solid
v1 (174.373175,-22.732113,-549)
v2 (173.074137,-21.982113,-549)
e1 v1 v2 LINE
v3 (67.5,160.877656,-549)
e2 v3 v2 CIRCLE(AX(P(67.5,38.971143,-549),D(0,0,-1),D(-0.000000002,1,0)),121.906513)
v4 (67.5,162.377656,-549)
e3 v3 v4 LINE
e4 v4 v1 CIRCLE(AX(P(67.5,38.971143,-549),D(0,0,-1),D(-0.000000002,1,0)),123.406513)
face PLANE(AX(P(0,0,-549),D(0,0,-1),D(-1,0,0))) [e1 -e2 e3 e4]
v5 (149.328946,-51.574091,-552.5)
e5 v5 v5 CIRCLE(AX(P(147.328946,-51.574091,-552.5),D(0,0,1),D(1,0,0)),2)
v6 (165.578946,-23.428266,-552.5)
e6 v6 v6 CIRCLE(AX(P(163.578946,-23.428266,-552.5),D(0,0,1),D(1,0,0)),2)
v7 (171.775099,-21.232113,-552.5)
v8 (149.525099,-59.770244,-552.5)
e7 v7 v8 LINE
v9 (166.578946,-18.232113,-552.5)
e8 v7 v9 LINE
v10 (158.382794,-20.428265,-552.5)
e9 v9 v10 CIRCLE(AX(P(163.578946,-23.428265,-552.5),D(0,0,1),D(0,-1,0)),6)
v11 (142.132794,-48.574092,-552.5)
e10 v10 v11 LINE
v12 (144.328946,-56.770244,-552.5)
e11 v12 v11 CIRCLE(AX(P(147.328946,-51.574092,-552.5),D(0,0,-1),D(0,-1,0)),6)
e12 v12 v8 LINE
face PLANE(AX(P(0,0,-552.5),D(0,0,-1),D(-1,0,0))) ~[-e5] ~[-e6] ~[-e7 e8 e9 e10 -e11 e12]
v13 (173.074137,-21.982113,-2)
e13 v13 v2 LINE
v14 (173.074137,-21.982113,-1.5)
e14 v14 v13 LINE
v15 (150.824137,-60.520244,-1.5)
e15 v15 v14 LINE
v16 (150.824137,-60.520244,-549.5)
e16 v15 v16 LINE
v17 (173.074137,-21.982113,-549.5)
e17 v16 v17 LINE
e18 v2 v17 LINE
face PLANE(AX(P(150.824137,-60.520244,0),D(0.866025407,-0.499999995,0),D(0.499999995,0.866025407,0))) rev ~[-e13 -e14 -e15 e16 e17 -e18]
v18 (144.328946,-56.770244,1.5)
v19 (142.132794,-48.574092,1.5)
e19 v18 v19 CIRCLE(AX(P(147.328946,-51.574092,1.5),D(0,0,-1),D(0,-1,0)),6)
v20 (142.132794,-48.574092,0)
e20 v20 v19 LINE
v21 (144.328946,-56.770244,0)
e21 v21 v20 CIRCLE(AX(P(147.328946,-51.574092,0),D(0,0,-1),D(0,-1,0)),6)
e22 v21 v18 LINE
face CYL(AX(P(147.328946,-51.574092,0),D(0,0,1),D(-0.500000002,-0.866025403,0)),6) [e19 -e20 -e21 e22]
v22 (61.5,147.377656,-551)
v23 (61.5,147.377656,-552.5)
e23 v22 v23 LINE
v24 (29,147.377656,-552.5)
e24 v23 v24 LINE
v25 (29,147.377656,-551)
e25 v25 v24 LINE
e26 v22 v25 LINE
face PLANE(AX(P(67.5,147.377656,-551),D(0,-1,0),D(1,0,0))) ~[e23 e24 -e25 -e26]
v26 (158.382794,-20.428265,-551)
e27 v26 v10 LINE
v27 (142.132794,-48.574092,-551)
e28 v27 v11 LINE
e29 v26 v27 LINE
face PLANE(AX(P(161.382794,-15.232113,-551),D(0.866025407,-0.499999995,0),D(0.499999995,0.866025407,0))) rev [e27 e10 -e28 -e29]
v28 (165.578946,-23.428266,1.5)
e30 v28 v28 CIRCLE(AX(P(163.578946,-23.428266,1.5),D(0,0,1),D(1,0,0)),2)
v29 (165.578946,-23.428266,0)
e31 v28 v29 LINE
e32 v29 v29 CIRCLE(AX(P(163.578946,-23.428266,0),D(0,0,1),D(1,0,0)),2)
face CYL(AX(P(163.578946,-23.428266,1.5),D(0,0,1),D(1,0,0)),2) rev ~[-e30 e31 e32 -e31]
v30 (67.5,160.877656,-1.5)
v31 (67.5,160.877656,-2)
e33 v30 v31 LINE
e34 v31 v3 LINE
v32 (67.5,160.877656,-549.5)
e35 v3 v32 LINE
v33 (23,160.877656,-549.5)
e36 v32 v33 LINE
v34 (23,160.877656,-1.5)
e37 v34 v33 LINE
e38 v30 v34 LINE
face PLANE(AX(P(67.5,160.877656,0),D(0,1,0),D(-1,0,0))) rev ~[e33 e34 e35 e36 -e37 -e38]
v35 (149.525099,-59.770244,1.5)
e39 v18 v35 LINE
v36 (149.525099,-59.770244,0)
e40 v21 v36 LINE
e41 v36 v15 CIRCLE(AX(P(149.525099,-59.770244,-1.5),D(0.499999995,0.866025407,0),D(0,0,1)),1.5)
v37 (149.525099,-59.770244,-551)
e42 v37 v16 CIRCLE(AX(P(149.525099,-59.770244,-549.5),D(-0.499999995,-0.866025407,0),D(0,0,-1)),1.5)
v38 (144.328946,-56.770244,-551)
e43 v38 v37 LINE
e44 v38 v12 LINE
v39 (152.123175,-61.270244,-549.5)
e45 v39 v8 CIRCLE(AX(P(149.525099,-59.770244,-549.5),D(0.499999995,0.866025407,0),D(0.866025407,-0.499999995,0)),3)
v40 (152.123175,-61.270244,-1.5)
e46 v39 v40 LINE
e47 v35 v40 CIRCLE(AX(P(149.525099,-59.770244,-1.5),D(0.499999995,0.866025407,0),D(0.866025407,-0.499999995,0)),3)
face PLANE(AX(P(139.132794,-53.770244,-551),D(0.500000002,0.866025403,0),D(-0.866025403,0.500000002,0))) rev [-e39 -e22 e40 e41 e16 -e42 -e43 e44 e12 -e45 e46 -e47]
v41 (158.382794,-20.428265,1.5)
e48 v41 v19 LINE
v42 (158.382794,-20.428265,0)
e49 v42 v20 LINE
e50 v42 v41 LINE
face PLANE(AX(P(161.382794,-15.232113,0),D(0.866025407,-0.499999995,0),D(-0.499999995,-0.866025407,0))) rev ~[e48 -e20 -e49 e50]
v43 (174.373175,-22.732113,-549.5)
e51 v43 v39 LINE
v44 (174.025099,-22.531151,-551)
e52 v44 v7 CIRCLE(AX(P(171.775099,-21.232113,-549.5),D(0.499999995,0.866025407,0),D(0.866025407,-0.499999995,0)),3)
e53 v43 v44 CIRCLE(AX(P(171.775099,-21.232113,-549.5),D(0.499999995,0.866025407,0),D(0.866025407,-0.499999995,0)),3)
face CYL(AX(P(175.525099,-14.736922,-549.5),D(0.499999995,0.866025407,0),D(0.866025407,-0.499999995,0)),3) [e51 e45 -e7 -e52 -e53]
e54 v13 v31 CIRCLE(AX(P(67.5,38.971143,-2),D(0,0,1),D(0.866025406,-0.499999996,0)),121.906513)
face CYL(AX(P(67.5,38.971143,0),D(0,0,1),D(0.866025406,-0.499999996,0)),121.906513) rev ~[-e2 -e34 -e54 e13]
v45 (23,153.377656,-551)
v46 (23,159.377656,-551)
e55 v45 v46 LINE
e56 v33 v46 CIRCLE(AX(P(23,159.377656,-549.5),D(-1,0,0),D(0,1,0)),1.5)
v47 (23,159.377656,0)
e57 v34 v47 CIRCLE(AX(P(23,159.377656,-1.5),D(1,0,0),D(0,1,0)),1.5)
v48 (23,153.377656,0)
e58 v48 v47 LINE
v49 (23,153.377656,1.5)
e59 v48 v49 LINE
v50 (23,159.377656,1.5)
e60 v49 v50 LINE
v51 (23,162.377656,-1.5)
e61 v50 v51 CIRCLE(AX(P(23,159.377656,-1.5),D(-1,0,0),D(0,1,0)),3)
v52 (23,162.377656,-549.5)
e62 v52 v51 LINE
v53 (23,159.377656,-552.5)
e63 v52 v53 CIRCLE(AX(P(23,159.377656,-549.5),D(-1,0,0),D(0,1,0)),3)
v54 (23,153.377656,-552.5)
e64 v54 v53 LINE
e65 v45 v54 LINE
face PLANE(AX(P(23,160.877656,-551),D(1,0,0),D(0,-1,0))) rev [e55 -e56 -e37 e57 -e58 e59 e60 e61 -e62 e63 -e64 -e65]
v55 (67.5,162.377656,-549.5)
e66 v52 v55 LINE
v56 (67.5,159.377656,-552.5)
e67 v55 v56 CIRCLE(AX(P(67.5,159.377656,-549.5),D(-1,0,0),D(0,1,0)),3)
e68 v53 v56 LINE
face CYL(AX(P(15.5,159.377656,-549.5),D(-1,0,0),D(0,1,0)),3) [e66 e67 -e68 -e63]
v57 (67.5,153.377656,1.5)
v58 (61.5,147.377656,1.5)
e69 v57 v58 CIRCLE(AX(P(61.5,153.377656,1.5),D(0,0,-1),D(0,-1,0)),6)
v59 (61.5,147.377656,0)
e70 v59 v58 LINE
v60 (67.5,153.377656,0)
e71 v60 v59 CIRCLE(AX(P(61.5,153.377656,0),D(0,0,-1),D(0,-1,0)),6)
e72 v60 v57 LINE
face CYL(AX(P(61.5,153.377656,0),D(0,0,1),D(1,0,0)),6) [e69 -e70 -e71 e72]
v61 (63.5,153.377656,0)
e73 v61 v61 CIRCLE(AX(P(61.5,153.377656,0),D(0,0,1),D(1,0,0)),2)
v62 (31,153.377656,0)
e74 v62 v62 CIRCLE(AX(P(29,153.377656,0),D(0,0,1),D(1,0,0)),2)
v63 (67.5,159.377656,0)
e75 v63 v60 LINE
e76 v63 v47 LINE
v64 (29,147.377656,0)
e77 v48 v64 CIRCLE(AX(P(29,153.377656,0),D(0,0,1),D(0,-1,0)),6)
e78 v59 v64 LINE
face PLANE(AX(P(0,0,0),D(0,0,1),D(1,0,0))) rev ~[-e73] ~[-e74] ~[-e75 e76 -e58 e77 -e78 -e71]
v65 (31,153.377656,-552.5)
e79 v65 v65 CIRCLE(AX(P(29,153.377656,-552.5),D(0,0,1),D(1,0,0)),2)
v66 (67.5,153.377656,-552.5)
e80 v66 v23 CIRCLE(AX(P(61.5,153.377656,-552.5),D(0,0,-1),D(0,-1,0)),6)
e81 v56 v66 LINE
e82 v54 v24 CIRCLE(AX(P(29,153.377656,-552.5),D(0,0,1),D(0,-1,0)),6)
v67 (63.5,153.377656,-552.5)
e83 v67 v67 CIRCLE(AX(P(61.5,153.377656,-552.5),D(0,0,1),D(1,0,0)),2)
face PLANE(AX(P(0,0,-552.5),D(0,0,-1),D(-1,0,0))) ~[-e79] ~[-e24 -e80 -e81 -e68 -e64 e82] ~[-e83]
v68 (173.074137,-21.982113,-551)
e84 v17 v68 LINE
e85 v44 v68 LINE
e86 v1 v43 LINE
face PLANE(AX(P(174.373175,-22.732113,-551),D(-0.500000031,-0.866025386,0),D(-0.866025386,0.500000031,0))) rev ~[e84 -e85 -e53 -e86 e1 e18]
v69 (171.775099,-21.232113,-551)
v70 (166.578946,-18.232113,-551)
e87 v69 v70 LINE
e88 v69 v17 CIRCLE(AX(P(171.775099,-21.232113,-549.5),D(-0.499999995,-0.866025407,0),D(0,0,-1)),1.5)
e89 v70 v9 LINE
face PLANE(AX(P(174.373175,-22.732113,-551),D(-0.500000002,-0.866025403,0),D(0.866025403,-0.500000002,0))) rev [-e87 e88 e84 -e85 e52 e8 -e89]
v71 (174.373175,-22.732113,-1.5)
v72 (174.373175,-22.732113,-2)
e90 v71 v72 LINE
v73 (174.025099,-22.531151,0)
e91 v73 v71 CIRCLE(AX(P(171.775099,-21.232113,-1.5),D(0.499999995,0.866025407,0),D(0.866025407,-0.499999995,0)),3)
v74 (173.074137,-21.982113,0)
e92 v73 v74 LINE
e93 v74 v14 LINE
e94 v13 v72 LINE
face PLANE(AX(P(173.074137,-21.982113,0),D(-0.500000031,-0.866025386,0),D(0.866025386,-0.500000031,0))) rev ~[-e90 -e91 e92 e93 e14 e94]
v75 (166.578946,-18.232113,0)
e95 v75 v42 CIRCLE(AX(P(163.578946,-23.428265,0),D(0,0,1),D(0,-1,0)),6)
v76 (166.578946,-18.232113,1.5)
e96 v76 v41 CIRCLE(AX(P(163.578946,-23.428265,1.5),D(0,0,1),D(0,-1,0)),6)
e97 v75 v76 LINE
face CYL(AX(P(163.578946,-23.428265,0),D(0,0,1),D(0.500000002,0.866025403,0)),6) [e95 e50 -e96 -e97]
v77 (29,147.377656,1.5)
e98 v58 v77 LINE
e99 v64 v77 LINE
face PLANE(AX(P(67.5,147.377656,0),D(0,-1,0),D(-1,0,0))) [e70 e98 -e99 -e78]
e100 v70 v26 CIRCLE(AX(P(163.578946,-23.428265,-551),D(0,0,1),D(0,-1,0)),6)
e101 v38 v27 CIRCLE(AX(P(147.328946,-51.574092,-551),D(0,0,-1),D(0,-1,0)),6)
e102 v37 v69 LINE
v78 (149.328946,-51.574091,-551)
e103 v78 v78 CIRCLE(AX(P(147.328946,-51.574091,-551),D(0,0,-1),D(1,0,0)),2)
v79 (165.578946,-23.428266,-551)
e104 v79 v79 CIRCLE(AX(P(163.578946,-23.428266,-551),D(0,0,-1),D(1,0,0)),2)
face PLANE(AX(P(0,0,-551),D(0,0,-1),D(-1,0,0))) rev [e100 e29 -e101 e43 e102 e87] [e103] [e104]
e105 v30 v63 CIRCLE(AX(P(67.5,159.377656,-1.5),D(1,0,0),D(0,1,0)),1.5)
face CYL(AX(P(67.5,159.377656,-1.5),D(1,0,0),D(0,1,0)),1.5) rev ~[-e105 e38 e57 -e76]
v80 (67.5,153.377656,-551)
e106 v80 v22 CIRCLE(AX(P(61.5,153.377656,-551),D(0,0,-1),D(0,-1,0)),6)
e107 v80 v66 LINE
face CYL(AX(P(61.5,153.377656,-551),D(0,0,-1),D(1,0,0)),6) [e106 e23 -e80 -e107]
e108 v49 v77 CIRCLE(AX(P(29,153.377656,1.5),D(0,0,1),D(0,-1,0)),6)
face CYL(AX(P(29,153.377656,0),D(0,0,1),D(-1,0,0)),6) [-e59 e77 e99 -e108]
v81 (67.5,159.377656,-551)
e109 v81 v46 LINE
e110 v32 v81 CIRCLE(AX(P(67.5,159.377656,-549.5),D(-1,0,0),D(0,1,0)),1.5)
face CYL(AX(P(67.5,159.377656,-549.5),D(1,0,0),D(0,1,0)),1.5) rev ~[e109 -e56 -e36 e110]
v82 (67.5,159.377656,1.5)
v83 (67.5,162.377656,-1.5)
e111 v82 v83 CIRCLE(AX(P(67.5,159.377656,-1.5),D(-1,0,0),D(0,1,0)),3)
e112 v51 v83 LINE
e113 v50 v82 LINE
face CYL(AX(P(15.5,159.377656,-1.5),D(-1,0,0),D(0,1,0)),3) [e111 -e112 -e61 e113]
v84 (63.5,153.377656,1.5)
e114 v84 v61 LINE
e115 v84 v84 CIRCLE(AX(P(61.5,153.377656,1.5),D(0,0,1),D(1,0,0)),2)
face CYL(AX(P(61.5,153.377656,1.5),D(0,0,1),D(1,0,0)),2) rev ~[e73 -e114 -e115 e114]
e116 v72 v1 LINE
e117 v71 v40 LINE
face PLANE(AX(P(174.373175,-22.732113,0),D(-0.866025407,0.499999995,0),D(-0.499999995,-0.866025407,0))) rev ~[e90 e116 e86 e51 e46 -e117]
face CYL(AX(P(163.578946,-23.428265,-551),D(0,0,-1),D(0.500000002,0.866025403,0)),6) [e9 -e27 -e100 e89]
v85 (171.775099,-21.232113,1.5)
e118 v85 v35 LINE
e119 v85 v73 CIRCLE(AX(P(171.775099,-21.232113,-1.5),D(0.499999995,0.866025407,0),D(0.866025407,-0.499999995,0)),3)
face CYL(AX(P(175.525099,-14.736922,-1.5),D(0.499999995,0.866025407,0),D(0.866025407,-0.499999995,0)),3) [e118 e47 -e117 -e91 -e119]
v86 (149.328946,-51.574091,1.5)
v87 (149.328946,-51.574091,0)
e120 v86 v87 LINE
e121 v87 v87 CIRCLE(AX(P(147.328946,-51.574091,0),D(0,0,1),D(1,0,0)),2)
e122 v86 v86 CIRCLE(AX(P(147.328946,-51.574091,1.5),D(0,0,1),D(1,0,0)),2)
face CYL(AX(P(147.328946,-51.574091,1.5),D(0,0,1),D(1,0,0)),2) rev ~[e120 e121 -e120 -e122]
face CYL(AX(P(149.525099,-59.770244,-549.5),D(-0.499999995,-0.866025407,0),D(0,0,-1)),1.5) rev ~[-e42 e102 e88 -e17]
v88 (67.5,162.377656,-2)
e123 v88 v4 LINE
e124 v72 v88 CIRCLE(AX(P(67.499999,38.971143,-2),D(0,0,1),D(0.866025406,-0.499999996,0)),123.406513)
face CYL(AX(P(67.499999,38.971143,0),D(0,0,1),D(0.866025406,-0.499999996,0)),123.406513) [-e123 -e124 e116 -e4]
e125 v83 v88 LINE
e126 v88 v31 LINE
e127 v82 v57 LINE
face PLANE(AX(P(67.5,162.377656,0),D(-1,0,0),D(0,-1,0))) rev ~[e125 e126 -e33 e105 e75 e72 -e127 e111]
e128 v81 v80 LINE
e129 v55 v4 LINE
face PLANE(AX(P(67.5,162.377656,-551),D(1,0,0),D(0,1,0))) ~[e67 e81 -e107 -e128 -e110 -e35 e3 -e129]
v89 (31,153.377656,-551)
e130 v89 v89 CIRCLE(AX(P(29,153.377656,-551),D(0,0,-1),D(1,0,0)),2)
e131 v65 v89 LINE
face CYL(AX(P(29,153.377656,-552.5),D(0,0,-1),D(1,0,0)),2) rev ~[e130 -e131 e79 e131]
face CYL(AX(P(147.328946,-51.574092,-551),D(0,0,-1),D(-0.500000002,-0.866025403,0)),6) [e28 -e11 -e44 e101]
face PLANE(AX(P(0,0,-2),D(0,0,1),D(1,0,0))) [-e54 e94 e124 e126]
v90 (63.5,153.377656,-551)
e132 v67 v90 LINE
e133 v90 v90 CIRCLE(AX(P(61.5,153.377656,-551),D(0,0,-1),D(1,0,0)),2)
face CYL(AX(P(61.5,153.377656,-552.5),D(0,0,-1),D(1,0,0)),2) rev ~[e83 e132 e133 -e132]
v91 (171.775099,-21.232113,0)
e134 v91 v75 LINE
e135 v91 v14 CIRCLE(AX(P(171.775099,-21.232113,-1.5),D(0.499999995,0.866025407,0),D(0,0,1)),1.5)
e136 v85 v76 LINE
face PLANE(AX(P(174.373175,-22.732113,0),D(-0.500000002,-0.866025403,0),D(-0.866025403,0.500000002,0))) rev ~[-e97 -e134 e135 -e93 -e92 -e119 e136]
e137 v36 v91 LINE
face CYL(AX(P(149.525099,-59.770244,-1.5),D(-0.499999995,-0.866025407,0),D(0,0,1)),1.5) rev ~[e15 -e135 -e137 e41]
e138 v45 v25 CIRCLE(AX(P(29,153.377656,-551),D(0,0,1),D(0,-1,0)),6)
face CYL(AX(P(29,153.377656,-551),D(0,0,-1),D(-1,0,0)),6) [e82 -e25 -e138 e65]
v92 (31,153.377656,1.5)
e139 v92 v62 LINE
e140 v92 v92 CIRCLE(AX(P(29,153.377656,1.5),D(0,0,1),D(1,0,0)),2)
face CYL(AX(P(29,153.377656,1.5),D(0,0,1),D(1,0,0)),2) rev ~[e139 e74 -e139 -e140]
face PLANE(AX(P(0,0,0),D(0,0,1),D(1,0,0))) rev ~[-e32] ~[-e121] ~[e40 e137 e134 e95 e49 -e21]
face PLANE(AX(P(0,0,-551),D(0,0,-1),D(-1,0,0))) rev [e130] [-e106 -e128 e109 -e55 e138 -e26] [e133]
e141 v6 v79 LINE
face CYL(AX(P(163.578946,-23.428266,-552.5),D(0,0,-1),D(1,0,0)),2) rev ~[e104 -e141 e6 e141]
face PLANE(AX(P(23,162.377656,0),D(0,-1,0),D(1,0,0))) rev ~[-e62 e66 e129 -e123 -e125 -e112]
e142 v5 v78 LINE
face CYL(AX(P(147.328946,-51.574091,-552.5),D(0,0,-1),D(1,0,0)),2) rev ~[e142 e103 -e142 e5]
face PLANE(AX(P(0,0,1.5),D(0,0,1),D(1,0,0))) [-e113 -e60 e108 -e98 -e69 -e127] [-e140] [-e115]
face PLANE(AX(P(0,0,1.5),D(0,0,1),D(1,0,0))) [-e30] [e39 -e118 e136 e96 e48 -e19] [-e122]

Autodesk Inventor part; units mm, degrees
ref_plane "YZ Plane" through (0, 0, 0) normal (1, 0, 0) x (0, 1, 0)
ref_plane "XZ Plane" through (0, 0, 0) normal (0, 1, 0) x (-1, 0, 0)
ref_plane "Work Plane1" through (0, 0, 0) normal (0, 0, 1) x (1, 0, 0)
sketch "Sketch1" plane through (0, 0, 0) normal (0, 0, 1) x (1, 0, 0)
  arc A0 (173.074137, -21.982113) -> (67.5, 160.877656) centre (67.5, 38.971143) ccw
  line L0 (67.5, 160.877656) -> (23, 160.877656)
  line L1 (150.824137, -60.520244) -> (173.074137, -21.982113)
  line L2 (23, 162.377656) -> (67.5, 162.377656)
  arc A1 (174.373175, -22.732113) -> (67.5, 162.377656) centre (67.5, 38.971143) ccw
  line L3 (174.373175, -22.732113) -> (152.123175, -61.270244)
  line L4 (150.824137, -60.520244) -> (152.123175, -61.270244)
  line L5 (23, 160.877656) -> (23, 162.377656)
  point P0 (0, 0)
  dimension "d0" = 1.5
ref_plane "Work Plane2" through (-342.433406, -360.707407, -533) normal (0, 0, -1) x (0, 1, 0)
extrude "Extrusion1" add sketch "Sketch1" against normal blind 551
sketch "Sketch2" plane through (0, 0, 0) normal (0, 0, 1) x (1, 0, 0)
  line L0 (174.373175, -22.732113) -> (152.123175, -61.270244)
  arc A0 (174.373175, -22.732113) -> (67.5, 162.377656) centre (67.5, 38.971143) ccw
  line L1 (23, 162.377656) -> (67.5, 162.377656)
  line L2 (23, 162.377656) -> (67.5, 162.377656)
  line L3 (67.5, 162.377656) -> (67.5, 147.377656)
  line L4 (67.5, 147.377656) -> (23, 147.377656)
  line L5 (23, 147.377656) -> (23, 162.377656)
  line L6 (152.123175, -61.270244) -> (174.373175, -22.732113)
  line L7 (174.373175, -22.732113) -> (161.382794, -15.232113)
  line L8 (161.382794, -15.232113) -> (139.132794, -53.770244)
  line L9 (139.132794, -53.770244) -> (152.123175, -61.270244)
  point P0 (0, 0)
  dimension "d3" = 15
  dimension "d4" = 15
extrude "Extrusion2" add sketch "Sketch2" along normal blind 1.5
fillet "Fillet4" radius 6 4 edges at (161.3828, -15.2321, 0.75) (139.1328, -53.7702, 0.75) (23, 147.3777, 0.75) (67.5, 147.3777, 0.75)
sketch "Sketch5" plane through (0, 0, 1.5) normal (0, 0, 1) x (1, 0, 0)
  arc A0 (61.5, 147.377656) -> (67.5, 153.377656) centre (61.5, 153.377656) ccw
  arc A1 (23, 153.377656) -> (29, 147.377656) centre (29, 153.377656) ccw
  arc A2 (142.132794, -48.574091) -> (144.328946, -56.770244) centre (147.328946, -51.574091) ccw
  line L0 (144.328946, -56.770244) -> (152.123175, -61.270244)
  line L1 (174.373175, -22.732113) -> (166.578946, -18.232113)
  arc A3 (166.578946, -18.232113) -> (158.382794, -20.428266) centre (163.578946, -23.428266) ccw
  line L2 (158.382794, -20.428266) -> (142.132794, -48.574091)
  circle A4 centre (29, 153.377656) radius 2
  circle A5 centre (61.5, 153.377656) radius 2
  circle A6 centre (163.578946, -23.428266) radius 2
  circle A7 centre (147.328946, -51.574091) radius 2
  line L3 (152.123175, -61.270244) -> (174.373175, -22.732113)
  point P0 (0, 0)
  dimension "d17" = 4
  dimension "d18" = 4
  dimension "d19" = 4
  dimension "d20" = 4
extrude "Extrusion5" cut sketch "Sketch5" against normal blind 2 contours A4 | A5 | A6 | A7
fillet "Fillet5" radius 1.5 2 edges at (45.25, 160.8777, 0) (161.9491, -41.2512, 0)
ref_plane "Work Plane5" through (0, 0, -275.5) normal (0, 0, 1) x (1, 0, 0)
mirror "Mirror3" about plane through (0, 0, -275.5) normal (0, 0, 1) of "Extrusion2", "Extrusion5", "Fillet4", "Fillet5"
sketch "Sketch7" plane through (0, 0, -551) normal (0, 0, -1) x (-1, 0, 0)
  line L0 (-67.5, 160.877656) -> (-67.5, 162.377656)
  arc A0 (-67.5, 162.377656) -> (-174.373175, -22.732113) centre (-67.5, 38.971143) ccw
  line L1 (-174.373175, -22.732113) -> (-173.074137, -21.982113)
  arc A1 (-67.5, 160.877656) -> (-173.074137, -21.982113) centre (-67.5, 38.971143) ccw
  point P0 (0, 0)
extrude "Extrusion7" cut sketch "Sketch7" against normal blind 2
sketch "Sketch8" plane through (0, 0, 0) normal (0, 0, 1) x (1, 0, 0)
  line L0 (67.5, 162.377656) -> (67.5, 160.877656)
  arc A0 (173.074137, -21.982113) -> (67.5, 160.877656) centre (67.5, 38.971143) ccw
  line L1 (173.074137, -21.982113) -> (174.373175, -22.732113)
  arc A1 (174.373175, -22.732113) -> (67.5, 162.377656) centre (67.5, 38.971143) ccw
  point P0 (0, 0)
extrude "Extrusion8" cut sketch "Sketch8" against normal blind 2
fillet "Fillet7" radius 3 4 edges at (45.25, 162.3777, 1.5) (163.2482, -42.0012, 1.5) (163.2482, -42.0012, -552.5) (45.25, 162.3777, -552.5)
properties material "Aluminum 6061"
